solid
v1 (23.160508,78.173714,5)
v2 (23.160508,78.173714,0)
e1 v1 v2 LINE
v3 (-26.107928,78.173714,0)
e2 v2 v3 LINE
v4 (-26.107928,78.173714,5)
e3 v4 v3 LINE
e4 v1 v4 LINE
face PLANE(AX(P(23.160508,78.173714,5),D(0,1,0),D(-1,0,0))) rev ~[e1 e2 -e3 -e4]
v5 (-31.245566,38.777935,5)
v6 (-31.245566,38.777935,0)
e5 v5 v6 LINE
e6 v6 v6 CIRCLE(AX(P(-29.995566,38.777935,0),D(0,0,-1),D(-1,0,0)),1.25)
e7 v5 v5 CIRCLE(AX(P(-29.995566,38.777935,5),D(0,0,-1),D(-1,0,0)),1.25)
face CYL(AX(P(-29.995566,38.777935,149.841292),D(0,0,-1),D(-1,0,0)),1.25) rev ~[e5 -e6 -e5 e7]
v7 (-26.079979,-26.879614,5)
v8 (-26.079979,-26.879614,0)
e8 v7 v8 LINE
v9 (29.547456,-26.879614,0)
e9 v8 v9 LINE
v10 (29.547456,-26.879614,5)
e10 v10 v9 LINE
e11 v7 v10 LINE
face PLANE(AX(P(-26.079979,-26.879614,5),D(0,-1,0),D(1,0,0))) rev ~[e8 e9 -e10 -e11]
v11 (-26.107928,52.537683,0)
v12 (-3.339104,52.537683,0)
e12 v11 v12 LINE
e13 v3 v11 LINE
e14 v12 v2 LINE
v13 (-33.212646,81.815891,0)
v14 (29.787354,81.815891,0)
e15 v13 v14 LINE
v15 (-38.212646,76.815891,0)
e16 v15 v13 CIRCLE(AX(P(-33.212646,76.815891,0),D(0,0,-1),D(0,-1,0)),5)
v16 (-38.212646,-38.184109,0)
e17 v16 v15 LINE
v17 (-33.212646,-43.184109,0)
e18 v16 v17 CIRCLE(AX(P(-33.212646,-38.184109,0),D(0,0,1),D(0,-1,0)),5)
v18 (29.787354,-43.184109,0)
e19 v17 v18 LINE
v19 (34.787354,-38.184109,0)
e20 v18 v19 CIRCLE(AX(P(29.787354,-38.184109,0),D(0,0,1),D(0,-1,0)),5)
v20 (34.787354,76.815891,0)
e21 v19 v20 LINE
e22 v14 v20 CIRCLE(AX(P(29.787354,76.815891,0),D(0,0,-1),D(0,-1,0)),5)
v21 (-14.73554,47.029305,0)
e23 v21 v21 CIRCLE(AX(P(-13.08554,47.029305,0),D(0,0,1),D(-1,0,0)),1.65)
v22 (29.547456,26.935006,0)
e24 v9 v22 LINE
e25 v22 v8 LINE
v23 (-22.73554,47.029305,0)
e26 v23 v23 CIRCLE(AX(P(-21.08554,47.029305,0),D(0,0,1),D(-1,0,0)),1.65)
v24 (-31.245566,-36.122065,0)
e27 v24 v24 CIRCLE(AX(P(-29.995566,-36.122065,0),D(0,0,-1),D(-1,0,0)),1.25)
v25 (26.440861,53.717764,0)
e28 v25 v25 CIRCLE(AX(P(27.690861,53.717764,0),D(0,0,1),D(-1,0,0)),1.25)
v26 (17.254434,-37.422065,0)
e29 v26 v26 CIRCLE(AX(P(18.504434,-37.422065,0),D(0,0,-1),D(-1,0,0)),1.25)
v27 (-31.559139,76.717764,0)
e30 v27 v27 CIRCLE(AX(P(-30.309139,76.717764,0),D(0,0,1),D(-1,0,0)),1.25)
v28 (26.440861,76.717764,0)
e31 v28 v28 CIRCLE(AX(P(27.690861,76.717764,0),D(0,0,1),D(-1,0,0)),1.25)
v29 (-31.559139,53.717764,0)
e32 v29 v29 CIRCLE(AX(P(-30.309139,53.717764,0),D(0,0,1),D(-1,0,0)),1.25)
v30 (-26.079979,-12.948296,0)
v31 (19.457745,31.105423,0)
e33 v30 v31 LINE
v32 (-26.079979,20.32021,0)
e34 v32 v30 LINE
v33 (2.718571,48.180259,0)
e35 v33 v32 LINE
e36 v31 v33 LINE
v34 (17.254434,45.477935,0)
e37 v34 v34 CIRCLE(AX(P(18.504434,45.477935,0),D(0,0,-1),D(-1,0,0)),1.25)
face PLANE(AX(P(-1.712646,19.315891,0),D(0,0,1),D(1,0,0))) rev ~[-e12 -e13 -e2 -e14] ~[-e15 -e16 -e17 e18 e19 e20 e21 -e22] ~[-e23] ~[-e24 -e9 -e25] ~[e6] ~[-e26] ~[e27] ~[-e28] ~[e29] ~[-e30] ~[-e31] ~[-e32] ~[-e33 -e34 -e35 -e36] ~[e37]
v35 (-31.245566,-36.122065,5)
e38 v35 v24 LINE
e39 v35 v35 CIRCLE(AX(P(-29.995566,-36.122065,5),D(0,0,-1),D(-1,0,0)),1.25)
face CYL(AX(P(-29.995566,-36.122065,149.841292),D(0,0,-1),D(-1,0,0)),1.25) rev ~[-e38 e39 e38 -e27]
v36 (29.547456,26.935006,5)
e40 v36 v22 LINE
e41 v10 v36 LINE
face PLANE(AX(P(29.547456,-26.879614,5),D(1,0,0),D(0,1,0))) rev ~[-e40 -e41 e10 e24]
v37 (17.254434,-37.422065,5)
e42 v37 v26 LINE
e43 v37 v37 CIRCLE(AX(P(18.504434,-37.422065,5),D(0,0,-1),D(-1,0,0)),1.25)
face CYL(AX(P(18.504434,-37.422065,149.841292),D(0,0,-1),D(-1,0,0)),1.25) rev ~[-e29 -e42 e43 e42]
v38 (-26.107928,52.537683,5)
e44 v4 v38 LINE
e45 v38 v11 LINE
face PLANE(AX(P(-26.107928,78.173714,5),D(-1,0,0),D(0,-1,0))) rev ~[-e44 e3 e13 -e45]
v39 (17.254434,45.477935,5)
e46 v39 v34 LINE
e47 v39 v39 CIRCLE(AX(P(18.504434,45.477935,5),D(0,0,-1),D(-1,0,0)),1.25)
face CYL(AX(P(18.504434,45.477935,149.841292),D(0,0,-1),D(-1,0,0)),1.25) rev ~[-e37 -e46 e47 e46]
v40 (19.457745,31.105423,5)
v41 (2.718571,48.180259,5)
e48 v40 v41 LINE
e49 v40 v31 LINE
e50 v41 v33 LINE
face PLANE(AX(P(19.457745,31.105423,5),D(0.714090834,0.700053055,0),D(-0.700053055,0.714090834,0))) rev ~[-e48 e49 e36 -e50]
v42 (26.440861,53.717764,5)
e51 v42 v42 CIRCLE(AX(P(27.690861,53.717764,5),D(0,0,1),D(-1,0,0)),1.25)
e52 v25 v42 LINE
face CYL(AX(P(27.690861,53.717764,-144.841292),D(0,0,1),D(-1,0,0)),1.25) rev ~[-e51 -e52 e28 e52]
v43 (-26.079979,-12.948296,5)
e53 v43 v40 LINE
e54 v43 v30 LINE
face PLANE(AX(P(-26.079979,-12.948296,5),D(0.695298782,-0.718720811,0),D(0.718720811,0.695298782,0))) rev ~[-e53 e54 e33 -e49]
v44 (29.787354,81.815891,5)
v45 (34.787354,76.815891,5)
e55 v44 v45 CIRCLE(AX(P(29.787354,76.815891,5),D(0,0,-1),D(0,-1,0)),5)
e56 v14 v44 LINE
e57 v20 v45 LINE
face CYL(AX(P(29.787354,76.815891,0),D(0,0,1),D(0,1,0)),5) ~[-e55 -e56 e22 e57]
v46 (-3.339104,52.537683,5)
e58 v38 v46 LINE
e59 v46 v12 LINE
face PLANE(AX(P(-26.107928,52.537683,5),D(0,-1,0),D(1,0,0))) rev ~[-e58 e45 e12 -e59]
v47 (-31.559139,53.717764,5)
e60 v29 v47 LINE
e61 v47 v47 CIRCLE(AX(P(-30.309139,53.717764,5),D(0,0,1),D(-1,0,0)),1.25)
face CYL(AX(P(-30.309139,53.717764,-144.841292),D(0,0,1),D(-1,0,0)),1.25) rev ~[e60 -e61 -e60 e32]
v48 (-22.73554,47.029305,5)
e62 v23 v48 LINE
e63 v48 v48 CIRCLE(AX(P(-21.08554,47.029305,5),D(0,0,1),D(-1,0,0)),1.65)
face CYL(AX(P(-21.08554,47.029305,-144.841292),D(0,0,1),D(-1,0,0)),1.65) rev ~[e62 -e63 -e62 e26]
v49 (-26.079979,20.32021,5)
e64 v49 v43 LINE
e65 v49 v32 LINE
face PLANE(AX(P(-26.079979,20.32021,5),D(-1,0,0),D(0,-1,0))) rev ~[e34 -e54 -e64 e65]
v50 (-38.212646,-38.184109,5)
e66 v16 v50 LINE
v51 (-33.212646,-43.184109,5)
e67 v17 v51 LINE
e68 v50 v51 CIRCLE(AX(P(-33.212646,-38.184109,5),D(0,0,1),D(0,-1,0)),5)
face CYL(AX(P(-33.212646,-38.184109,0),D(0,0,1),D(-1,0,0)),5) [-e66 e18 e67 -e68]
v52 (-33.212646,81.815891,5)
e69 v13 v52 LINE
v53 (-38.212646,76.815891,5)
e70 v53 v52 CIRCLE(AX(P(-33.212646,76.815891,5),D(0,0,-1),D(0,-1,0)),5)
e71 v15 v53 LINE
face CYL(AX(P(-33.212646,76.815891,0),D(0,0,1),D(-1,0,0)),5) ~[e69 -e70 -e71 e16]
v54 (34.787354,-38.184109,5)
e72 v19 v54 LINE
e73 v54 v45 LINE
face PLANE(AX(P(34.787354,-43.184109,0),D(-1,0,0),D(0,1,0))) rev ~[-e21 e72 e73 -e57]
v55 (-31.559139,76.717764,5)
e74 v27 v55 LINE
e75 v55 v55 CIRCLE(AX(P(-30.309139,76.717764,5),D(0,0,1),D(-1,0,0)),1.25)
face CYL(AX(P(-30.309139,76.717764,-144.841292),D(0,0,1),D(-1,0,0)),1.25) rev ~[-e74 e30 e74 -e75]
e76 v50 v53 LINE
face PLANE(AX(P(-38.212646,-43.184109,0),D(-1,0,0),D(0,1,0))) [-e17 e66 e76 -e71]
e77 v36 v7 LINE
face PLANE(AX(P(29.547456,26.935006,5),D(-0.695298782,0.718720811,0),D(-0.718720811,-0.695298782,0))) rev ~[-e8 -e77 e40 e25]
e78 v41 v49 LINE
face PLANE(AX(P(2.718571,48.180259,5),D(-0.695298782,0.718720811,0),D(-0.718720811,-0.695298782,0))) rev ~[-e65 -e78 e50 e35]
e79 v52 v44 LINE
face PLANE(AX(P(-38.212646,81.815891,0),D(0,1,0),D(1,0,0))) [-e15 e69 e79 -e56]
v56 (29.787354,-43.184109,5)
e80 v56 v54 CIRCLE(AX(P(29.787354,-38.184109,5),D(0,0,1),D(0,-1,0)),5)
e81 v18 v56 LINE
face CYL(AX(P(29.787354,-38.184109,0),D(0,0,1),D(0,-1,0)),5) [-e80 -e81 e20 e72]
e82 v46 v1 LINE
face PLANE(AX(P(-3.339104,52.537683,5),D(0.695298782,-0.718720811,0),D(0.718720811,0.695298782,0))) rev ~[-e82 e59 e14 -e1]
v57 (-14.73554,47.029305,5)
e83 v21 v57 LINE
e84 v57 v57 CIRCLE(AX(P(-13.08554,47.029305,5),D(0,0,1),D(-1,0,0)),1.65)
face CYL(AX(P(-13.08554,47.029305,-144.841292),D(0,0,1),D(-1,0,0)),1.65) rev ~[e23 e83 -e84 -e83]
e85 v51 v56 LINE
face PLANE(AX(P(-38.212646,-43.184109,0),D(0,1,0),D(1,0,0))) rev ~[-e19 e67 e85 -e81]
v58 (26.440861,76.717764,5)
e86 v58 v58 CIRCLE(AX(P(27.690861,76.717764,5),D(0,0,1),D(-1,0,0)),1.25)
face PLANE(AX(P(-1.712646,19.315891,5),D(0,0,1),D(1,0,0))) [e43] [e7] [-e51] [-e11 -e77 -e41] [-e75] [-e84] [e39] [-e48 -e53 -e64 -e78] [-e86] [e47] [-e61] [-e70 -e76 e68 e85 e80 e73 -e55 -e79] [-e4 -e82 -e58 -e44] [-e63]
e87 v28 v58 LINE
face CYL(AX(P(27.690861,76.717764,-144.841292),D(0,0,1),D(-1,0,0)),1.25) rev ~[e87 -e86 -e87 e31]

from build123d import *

# Parameters (mm, degrees)
F0_W     = 73
F0_H     = 125
F1_DEPTH = 5
F2_D     = 2.5
F3_D     = 3.3
F4_R     = 5
F7_DEPTH = 25
F8_D     = 2.5


# Not quite as in the source:
# - a feature names something its author has since deleted; it is built from what else it names


with BuildPart() as f1:
    # F0 (on Top) → F1 (new body)
    with BuildSketch(Plane.XY):
        with Locations((-1.7126457989, 19.3158909678)):
            Rectangle(F0_W, F0_H)
    extrude(amount=F1_DEPTH)

    # F2 (through all)
    with Locations(Plane(origin=(0, 0, 0), x_dir=(1, 0, 0), z_dir=(0, 0, -1))):
        with Locations((-30.3091388196, -76.7177641392), (27.6908611804, -76.7177641392), (27.6908611804, -53.7177641392), (-30.3091388196, -53.7177641392)):
            Hole(F2_D / 2)

    # F3 (through all)
    with Locations(Plane(origin=(0, 0, 0), x_dir=(1, 0, 0), z_dir=(0, 0, -1))):
        with Locations((-21.0855398327, -47.0293052495), (-13.0855398327, -47.0293052495)):
            Hole(F3_D / 2)

    # F4
    f4_edges = [f1.edges().sort_by_distance(p)[0] for p in [
        (-38.212646, 81.815891, 2.5),
        (34.787354, 81.815891, 2.5),
        (34.787354, -43.184109, 2.5),
        (-38.212646, -43.184109, 2.5),
    ]]
    fillet(f4_edges, radius=F4_R)

    # F5 (on face) → F7 (cut)
    with BuildSketch(Plane.XY.offset(5)):
        Polygon((19.4577450805, 31.105422746), (2.7185706181, 48.1802586667), (-26.0799791984, 20.3202102417), (-26.0799791984, -12.9482956412), align=None)
        Polygon((29.5474557331, 26.9350063375), (-26.0799791984, -26.8796142191), (29.5474557331, -26.8796142191), align=None)
        Polygon((-3.3391041424, 52.5376833975), (23.1605084746, 78.173713526), (-26.1079283048, 78.173713526), (-26.1079283048, 52.5376833975), align=None)
    extrude(amount=-F7_DEPTH, mode=Mode.SUBTRACT)

    # F8 (through all)
    with Locations(Plane.XY.offset(5)):
        with Locations((-29.995566234, 38.7779349625), (18.504433766, 45.4779349625), (18.504433766, -37.4220650375), (-29.995566234, -36.1220650375)):
            Hole(F8_D / 2)


solid = f1.part
